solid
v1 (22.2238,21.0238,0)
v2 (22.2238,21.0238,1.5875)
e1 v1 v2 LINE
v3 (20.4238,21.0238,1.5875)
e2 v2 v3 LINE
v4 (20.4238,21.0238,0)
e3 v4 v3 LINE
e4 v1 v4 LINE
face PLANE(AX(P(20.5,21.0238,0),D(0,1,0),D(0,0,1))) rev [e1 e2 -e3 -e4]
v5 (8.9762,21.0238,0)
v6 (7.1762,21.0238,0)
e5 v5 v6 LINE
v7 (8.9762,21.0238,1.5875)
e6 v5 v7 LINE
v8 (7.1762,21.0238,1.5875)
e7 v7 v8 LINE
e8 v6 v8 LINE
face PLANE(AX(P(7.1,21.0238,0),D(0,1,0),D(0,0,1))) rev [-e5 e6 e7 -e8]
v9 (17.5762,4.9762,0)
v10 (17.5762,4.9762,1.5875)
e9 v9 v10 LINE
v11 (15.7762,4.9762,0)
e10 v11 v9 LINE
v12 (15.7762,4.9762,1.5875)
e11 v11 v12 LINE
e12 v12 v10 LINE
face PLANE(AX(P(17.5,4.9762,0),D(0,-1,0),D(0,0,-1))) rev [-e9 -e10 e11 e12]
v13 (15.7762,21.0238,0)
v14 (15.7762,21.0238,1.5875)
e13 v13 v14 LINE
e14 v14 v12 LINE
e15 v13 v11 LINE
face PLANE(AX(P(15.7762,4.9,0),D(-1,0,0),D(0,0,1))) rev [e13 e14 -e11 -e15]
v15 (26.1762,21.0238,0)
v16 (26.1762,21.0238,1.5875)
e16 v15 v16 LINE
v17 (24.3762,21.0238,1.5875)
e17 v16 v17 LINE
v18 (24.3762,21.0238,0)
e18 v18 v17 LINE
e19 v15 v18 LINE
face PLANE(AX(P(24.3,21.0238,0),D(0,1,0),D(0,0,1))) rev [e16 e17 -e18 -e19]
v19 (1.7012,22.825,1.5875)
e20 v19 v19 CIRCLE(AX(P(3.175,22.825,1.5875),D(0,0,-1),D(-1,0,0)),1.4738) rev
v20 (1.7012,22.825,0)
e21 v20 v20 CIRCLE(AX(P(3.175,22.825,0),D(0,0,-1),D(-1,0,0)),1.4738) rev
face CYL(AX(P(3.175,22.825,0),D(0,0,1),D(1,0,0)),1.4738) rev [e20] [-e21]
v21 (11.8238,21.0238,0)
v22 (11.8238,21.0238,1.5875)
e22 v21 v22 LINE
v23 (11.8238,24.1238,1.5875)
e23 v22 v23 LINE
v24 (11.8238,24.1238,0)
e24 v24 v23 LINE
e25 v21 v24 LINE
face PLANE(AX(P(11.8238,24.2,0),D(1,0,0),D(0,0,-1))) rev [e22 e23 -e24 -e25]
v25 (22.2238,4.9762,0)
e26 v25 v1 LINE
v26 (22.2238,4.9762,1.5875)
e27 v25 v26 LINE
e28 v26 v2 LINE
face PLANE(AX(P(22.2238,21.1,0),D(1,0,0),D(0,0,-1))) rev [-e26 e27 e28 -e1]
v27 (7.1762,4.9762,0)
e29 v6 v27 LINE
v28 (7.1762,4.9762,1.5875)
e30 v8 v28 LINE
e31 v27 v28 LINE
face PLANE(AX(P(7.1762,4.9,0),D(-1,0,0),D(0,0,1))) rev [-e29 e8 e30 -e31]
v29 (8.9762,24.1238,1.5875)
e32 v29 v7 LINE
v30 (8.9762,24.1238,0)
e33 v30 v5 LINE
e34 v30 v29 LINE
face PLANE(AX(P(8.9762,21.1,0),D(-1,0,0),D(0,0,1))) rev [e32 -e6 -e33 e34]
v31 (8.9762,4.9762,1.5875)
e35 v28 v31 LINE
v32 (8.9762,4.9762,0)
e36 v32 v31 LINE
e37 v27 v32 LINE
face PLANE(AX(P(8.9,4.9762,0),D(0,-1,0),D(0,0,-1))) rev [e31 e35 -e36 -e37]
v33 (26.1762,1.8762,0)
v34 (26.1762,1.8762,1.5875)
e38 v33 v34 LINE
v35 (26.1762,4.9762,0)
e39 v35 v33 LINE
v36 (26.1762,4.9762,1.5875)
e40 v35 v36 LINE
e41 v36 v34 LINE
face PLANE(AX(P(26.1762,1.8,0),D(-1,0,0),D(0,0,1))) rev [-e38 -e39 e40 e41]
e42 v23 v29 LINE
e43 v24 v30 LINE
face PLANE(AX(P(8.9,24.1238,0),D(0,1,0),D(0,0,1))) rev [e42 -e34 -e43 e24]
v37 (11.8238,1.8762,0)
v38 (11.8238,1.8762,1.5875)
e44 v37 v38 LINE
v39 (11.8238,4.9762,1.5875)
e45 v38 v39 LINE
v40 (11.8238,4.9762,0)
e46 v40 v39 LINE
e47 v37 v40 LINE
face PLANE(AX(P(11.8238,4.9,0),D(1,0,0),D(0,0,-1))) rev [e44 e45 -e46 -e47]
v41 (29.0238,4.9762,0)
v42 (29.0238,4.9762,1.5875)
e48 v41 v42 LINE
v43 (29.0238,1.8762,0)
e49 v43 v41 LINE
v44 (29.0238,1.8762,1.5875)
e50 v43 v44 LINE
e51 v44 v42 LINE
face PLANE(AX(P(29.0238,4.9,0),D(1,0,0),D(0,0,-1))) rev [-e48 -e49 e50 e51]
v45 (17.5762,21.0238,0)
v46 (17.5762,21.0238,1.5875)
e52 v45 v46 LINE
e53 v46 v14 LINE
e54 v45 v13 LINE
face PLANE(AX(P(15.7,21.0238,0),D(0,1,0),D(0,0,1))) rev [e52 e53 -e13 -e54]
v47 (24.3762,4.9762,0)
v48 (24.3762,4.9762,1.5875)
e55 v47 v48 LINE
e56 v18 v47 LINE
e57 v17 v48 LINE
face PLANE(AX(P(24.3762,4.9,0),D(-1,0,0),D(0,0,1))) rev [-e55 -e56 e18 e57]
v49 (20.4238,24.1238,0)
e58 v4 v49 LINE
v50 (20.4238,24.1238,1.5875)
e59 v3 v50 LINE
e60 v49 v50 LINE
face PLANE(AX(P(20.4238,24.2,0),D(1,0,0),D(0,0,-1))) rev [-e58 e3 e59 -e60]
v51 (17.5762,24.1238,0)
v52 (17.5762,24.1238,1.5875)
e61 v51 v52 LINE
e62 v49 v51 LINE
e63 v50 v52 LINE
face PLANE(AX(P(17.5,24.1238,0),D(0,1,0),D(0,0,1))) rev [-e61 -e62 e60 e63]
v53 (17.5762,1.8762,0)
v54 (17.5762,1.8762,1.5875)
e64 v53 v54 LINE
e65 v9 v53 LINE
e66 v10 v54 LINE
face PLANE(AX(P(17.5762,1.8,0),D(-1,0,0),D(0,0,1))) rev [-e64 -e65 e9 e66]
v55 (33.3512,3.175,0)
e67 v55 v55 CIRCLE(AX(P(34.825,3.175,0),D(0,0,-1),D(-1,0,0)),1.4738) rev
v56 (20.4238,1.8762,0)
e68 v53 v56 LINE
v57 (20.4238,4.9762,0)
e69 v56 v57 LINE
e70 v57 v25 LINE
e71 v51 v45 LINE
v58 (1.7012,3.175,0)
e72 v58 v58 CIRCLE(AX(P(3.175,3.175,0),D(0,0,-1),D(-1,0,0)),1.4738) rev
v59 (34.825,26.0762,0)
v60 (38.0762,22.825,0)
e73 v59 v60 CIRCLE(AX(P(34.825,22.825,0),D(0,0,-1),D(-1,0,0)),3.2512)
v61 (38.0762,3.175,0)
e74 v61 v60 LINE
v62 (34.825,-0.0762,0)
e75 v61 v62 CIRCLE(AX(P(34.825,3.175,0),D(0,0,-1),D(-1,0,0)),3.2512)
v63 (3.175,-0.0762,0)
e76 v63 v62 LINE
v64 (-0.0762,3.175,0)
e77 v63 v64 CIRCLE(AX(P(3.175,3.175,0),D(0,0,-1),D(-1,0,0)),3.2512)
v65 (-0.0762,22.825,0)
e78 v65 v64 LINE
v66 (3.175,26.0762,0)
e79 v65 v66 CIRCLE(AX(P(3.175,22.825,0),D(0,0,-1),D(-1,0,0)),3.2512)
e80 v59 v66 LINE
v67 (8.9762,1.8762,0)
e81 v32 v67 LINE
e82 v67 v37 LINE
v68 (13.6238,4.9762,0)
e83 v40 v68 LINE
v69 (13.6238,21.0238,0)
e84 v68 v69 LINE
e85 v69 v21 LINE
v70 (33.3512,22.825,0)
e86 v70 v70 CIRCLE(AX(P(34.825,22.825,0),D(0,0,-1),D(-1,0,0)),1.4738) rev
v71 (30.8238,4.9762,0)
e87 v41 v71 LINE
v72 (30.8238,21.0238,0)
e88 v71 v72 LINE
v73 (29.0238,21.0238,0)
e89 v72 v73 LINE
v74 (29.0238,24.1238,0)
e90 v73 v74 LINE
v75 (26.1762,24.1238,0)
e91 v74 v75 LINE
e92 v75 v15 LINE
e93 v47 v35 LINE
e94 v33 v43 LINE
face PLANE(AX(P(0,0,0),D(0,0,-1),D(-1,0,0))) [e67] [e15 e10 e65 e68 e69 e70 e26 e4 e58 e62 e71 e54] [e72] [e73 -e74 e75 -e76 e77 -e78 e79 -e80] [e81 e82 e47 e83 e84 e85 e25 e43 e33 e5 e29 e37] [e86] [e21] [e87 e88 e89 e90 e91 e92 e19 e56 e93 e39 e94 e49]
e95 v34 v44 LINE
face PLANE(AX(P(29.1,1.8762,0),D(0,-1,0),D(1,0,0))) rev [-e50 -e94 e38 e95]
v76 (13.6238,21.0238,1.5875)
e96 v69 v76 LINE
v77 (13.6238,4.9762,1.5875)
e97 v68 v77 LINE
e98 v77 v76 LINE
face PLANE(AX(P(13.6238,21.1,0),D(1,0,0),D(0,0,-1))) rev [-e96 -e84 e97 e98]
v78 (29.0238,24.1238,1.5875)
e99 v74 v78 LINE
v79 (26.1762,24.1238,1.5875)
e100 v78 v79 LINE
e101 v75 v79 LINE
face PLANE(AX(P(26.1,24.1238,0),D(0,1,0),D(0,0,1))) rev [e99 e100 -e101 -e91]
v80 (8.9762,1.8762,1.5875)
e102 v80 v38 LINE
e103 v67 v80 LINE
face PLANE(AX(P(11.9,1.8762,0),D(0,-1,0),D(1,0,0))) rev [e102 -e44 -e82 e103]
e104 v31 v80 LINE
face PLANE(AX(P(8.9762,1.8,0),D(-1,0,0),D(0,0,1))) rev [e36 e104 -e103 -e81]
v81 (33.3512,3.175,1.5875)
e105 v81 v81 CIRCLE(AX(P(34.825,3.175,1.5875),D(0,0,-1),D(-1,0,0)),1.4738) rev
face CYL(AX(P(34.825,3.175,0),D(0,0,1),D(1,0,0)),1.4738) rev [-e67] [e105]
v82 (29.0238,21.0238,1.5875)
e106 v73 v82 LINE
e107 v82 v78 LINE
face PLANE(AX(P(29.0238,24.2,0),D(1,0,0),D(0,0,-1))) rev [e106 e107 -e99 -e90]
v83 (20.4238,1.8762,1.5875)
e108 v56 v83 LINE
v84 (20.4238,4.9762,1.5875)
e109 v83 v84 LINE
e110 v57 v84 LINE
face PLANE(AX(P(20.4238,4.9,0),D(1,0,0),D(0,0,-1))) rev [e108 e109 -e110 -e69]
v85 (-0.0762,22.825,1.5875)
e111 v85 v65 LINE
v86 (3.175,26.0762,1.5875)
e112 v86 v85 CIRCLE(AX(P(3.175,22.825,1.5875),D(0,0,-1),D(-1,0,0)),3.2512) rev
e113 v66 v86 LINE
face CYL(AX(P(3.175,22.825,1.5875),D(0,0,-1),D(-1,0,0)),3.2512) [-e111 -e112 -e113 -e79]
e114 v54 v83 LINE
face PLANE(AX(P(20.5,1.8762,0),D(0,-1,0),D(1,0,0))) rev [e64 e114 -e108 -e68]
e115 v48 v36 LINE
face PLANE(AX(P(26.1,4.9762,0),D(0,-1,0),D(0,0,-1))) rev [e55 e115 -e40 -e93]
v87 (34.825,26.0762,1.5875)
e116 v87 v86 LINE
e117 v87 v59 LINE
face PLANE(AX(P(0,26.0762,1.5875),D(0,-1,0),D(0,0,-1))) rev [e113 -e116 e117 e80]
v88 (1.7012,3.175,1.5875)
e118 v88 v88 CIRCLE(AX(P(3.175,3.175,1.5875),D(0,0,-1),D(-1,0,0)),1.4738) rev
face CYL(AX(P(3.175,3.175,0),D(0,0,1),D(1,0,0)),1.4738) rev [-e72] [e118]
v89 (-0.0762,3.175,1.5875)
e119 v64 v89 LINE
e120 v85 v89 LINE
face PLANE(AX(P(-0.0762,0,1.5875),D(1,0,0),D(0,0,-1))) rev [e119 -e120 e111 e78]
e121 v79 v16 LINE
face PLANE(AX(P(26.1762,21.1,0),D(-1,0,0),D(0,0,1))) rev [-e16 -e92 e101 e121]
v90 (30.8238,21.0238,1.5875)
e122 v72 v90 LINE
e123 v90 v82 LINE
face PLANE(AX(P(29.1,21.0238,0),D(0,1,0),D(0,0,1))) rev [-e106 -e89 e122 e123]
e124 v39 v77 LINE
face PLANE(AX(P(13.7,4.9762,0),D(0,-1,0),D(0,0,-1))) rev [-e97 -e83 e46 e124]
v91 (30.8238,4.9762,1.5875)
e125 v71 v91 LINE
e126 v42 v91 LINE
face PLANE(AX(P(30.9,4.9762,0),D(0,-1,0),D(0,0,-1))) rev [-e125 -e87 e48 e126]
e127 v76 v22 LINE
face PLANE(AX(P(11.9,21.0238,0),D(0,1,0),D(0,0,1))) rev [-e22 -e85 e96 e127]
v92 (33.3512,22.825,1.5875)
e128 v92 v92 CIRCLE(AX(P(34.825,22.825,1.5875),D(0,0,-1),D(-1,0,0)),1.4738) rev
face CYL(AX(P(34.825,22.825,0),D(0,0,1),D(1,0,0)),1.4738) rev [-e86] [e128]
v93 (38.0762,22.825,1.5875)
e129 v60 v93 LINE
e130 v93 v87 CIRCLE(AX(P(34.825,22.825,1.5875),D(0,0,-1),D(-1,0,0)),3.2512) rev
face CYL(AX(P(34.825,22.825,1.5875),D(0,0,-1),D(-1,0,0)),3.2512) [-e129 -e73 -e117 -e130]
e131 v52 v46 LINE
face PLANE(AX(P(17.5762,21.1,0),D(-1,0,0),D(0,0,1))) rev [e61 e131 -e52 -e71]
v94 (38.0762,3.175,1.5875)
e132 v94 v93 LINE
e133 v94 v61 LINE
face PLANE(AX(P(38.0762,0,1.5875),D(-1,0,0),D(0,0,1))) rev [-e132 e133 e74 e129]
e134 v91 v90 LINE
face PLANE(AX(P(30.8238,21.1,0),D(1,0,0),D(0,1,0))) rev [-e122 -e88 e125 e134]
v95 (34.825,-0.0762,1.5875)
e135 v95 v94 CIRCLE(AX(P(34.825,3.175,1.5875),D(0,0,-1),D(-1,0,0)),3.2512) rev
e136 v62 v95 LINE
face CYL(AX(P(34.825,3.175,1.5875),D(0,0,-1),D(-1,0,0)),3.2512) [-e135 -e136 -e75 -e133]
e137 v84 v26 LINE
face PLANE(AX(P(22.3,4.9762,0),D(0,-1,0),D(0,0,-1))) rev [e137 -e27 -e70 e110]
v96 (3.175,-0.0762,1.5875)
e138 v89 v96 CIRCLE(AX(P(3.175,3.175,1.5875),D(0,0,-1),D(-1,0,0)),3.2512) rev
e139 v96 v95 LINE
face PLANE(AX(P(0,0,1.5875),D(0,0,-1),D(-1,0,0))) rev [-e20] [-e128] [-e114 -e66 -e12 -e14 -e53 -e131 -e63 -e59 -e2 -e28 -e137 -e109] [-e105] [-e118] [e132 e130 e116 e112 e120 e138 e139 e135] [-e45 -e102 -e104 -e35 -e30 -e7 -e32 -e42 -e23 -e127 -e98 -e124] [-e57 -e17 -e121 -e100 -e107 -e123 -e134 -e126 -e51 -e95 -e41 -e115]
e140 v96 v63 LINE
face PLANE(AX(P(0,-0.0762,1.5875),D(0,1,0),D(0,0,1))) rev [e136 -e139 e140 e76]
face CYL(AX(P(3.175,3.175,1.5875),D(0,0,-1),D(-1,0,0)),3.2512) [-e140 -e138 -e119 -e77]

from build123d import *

# Parameters (mm, degrees)
SKETCH2_W              = 38
SKETCH2_H              = 26
BOSS_EXTRUDE1_DEPTH    = 1.5875
CUT_EXTRUDE1_DEPTH     = 47.070816753
FILLET1_R              = 3.175
SKETCH6_R              = 1.55
CUT_EXTRUDE2_DEPTH     = 47.070816753
MOVE_FACE1_OUTLINE_R   = 1.55
MOVE_FACE1_OUTLINE_R_2 = 1.4738
MOVE_FACE1_DEPTH       = 1.5875


# Read off the part's stored shape, not the designer's step: Move Face1
with BuildPart() as part:
    # Sketch2 → Boss-Extrude1 (new body)
    with BuildSketch(Plane.XY):
        with Locations((19, 13)):
            Rectangle(SKETCH2_W, SKETCH2_H)
    extrude(amount=BOSS_EXTRUDE1_DEPTH)

    # Sketch3 → Cut-Extrude1 (cut, through all)
    with BuildSketch(Plane.XY.offset(1.5875)):
        Polygon((7.1, 21.1), (8.9, 21.1), (8.9, 24.2), (11.9, 24.2), (11.9, 21.1), (13.7, 21.1), (13.7, 4.9), (11.9, 4.9), (11.9, 1.8), (8.9, 1.8), (8.9, 4.9), (7.1, 4.9), align=None)
        Polygon((15.7, 21.1), (17.5, 21.1), (17.5, 24.2), (20.5, 24.2), (20.5, 21.1), (22.3, 21.1), (22.3, 4.9), (20.5, 4.9), (20.5, 1.8), (17.5, 1.8), (17.5, 4.9), (15.7, 4.9), align=None)
        Polygon((24.3, 21.1), (26.1, 21.1), (26.1, 24.2), (29.1, 24.2), (29.1, 21.1), (30.9, 21.1), (30.9, 4.9), (29.1, 4.9), (29.1, 1.8), (26.1, 1.8), (26.1, 4.9), (24.3, 4.9), align=None)
    extrude(amount=-CUT_EXTRUDE1_DEPTH, mode=Mode.SUBTRACT)

    # Fillet1
    fillet1_edges = [part.edges().sort_by_distance(p)[0] for p in [
        (0, 26, 0.79375),
        (38, 26, 0.79375),
        (38, 0, 0.79375),
        (0, 0, 0.79375),
    ]]
    fillet(fillet1_edges, radius=FILLET1_R)

    # Sketch6 → Cut-Extrude2 (cut, through all)
    with BuildSketch(Plane.XY.offset(1.5875)):
        with Locations((3.175, 22.825)):
            Circle(SKETCH6_R)
        with Locations((34.825, 22.825)):
            Circle(SKETCH6_R)
        with Locations((34.825, 3.175)):
            Circle(SKETCH6_R)
        with Locations((3.175, 3.175)):
            Circle(SKETCH6_R)
    extrude(amount=-CUT_EXTRUDE2_DEPTH, mode=Mode.SUBTRACT)

    # Move Face1 outline → Move Face1 (add)
    # profile 1 of 8: a face of its own
    with BuildSketch(Plane.XY):
        with BuildLine():
            Line((-0.0762, 22.825), (-0.0762, 3.175))
            ThreePointArc((-0.0762, 3.175), (0.876054433, 0.876054433), (3.175, -0.0762))
            Line((3.175, -0.0762), (34.825, -0.0762))
            ThreePointArc((34.825, -0.0762), (37.123945567, 0.876054433), (38.0762, 3.175))
            Line((38.0762, 3.175), (38.0762, 22.825))
            ThreePointArc((38.0762, 22.825), (37.123945567, 25.123945567), (34.825, 26.0762))
            Line((34.825, 26.0762), (3.175, 26.0762))
            ThreePointArc((3.175, 26.0762), (0.876054433, 25.123945567), (-0.0762, 22.825))
        make_face()
        with BuildLine():
            ThreePointArc((3.175, 0), (0.92993597, 0.92993597), (0, 3.175))
            Line((0, 3.175), (0, 22.825))
            ThreePointArc((0, 22.825), (0.92993597, 25.07006403), (3.175, 26))
            Line((3.175, 26), (34.825, 26))
            ThreePointArc((34.825, 26), (37.07006403, 25.07006403), (38, 22.825))
            Line((38, 22.825), (38, 3.175))
            ThreePointArc((38, 3.175), (37.07006403, 0.92993597), (34.825, 0))
            Line((34.825, 0), (3.175, 0))
        make_face(mode=Mode.SUBTRACT)
    # profile 2 of 8: a face of its own
    with BuildSketch(Plane.XY):
        Polygon((26.1, 21.1), (24.3, 21.1), (24.3, 4.9), (26.1, 4.9), (26.1, 1.8), (29.1, 1.8), (29.1, 4.9), (30.9, 4.9), (30.9, 21.1), (29.1, 21.1), (29.1, 24.2), (26.1, 24.2), align=None)
        Polygon((24.3762, 4.9762), (24.3762, 21.0238), (26.1762, 21.0238), (26.1762, 24.1238), (29.0238, 24.1238), (29.0238, 21.0238), (30.8238, 21.0238), (30.8238, 4.9762), (29.0238, 4.9762), (29.0238, 1.8762), (26.1762, 1.8762), (26.1762, 4.9762), align=None, mode=Mode.SUBTRACT)
    # profile 3 of 8: a face of its own
    with BuildSketch(Plane.XY):
        Polygon((17.5, 24.2), (17.5, 21.1), (15.7, 21.1), (15.7, 4.9), (17.5, 4.9), (17.5, 1.8), (20.5, 1.8), (20.5, 4.9), (22.3, 4.9), (22.3, 21.1), (20.5, 21.1), (20.5, 24.2), align=None)
        Polygon((15.7762, 21.0238), (17.5762, 21.0238), (17.5762, 24.1238), (20.4238, 24.1238), (20.4238, 21.0238), (22.2238, 21.0238), (22.2238, 4.9762), (20.4238, 4.9762), (20.4238, 1.8762), (17.5762, 1.8762), (17.5762, 4.9762), (15.7762, 4.9762), align=None, mode=Mode.SUBTRACT)
    # profile 4 of 8: a face of its own
    with BuildSketch(Plane.XY):
        Polygon((8.9, 24.2), (8.9, 21.1), (7.1, 21.1), (7.1, 4.9), (8.9, 4.9), (8.9, 1.8), (11.9, 1.8), (11.9, 4.9), (13.7, 4.9), (13.7, 21.1), (11.9, 21.1), (11.9, 24.2), align=None)
        Polygon((7.1762, 21.0238), (8.9762, 21.0238), (8.9762, 24.1238), (11.8238, 24.1238), (11.8238, 21.0238), (13.6238, 21.0238), (13.6238, 4.9762), (11.8238, 4.9762), (11.8238, 1.8762), (8.9762, 1.8762), (8.9762, 4.9762), (7.1762, 4.9762), align=None, mode=Mode.SUBTRACT)
    # profile 5 of 8: a face of its own
    with BuildSketch(Plane.XY):
        with Locations((3.175, 22.825)):
            Circle(MOVE_FACE1_OUTLINE_R)
        with Locations((3.175, 22.825)):
            Circle(MOVE_FACE1_OUTLINE_R_2, mode=Mode.SUBTRACT)
    # profile 6 of 8: a face of its own
    with BuildSketch(Plane.XY):
        with Locations((34.825, 22.825)):
            Circle(MOVE_FACE1_OUTLINE_R)
        with Locations((34.825, 22.825)):
            Circle(MOVE_FACE1_OUTLINE_R_2, mode=Mode.SUBTRACT)
    # profile 7 of 8: a face of its own
    with BuildSketch(Plane.XY):
        with Locations((34.825, 3.175)):
            Circle(MOVE_FACE1_OUTLINE_R)
        with Locations((34.825, 3.175)):
            Circle(MOVE_FACE1_OUTLINE_R_2, mode=Mode.SUBTRACT)
    # profile 8 of 8: a face of its own
    with BuildSketch(Plane.XY):
        with Locations((3.175, 3.175)):
            Circle(MOVE_FACE1_OUTLINE_R)
        with Locations((3.175, 3.175)):
            Circle(MOVE_FACE1_OUTLINE_R_2, mode=Mode.SUBTRACT)
    extrude(amount=MOVE_FACE1_DEPTH)


solid = part.part
